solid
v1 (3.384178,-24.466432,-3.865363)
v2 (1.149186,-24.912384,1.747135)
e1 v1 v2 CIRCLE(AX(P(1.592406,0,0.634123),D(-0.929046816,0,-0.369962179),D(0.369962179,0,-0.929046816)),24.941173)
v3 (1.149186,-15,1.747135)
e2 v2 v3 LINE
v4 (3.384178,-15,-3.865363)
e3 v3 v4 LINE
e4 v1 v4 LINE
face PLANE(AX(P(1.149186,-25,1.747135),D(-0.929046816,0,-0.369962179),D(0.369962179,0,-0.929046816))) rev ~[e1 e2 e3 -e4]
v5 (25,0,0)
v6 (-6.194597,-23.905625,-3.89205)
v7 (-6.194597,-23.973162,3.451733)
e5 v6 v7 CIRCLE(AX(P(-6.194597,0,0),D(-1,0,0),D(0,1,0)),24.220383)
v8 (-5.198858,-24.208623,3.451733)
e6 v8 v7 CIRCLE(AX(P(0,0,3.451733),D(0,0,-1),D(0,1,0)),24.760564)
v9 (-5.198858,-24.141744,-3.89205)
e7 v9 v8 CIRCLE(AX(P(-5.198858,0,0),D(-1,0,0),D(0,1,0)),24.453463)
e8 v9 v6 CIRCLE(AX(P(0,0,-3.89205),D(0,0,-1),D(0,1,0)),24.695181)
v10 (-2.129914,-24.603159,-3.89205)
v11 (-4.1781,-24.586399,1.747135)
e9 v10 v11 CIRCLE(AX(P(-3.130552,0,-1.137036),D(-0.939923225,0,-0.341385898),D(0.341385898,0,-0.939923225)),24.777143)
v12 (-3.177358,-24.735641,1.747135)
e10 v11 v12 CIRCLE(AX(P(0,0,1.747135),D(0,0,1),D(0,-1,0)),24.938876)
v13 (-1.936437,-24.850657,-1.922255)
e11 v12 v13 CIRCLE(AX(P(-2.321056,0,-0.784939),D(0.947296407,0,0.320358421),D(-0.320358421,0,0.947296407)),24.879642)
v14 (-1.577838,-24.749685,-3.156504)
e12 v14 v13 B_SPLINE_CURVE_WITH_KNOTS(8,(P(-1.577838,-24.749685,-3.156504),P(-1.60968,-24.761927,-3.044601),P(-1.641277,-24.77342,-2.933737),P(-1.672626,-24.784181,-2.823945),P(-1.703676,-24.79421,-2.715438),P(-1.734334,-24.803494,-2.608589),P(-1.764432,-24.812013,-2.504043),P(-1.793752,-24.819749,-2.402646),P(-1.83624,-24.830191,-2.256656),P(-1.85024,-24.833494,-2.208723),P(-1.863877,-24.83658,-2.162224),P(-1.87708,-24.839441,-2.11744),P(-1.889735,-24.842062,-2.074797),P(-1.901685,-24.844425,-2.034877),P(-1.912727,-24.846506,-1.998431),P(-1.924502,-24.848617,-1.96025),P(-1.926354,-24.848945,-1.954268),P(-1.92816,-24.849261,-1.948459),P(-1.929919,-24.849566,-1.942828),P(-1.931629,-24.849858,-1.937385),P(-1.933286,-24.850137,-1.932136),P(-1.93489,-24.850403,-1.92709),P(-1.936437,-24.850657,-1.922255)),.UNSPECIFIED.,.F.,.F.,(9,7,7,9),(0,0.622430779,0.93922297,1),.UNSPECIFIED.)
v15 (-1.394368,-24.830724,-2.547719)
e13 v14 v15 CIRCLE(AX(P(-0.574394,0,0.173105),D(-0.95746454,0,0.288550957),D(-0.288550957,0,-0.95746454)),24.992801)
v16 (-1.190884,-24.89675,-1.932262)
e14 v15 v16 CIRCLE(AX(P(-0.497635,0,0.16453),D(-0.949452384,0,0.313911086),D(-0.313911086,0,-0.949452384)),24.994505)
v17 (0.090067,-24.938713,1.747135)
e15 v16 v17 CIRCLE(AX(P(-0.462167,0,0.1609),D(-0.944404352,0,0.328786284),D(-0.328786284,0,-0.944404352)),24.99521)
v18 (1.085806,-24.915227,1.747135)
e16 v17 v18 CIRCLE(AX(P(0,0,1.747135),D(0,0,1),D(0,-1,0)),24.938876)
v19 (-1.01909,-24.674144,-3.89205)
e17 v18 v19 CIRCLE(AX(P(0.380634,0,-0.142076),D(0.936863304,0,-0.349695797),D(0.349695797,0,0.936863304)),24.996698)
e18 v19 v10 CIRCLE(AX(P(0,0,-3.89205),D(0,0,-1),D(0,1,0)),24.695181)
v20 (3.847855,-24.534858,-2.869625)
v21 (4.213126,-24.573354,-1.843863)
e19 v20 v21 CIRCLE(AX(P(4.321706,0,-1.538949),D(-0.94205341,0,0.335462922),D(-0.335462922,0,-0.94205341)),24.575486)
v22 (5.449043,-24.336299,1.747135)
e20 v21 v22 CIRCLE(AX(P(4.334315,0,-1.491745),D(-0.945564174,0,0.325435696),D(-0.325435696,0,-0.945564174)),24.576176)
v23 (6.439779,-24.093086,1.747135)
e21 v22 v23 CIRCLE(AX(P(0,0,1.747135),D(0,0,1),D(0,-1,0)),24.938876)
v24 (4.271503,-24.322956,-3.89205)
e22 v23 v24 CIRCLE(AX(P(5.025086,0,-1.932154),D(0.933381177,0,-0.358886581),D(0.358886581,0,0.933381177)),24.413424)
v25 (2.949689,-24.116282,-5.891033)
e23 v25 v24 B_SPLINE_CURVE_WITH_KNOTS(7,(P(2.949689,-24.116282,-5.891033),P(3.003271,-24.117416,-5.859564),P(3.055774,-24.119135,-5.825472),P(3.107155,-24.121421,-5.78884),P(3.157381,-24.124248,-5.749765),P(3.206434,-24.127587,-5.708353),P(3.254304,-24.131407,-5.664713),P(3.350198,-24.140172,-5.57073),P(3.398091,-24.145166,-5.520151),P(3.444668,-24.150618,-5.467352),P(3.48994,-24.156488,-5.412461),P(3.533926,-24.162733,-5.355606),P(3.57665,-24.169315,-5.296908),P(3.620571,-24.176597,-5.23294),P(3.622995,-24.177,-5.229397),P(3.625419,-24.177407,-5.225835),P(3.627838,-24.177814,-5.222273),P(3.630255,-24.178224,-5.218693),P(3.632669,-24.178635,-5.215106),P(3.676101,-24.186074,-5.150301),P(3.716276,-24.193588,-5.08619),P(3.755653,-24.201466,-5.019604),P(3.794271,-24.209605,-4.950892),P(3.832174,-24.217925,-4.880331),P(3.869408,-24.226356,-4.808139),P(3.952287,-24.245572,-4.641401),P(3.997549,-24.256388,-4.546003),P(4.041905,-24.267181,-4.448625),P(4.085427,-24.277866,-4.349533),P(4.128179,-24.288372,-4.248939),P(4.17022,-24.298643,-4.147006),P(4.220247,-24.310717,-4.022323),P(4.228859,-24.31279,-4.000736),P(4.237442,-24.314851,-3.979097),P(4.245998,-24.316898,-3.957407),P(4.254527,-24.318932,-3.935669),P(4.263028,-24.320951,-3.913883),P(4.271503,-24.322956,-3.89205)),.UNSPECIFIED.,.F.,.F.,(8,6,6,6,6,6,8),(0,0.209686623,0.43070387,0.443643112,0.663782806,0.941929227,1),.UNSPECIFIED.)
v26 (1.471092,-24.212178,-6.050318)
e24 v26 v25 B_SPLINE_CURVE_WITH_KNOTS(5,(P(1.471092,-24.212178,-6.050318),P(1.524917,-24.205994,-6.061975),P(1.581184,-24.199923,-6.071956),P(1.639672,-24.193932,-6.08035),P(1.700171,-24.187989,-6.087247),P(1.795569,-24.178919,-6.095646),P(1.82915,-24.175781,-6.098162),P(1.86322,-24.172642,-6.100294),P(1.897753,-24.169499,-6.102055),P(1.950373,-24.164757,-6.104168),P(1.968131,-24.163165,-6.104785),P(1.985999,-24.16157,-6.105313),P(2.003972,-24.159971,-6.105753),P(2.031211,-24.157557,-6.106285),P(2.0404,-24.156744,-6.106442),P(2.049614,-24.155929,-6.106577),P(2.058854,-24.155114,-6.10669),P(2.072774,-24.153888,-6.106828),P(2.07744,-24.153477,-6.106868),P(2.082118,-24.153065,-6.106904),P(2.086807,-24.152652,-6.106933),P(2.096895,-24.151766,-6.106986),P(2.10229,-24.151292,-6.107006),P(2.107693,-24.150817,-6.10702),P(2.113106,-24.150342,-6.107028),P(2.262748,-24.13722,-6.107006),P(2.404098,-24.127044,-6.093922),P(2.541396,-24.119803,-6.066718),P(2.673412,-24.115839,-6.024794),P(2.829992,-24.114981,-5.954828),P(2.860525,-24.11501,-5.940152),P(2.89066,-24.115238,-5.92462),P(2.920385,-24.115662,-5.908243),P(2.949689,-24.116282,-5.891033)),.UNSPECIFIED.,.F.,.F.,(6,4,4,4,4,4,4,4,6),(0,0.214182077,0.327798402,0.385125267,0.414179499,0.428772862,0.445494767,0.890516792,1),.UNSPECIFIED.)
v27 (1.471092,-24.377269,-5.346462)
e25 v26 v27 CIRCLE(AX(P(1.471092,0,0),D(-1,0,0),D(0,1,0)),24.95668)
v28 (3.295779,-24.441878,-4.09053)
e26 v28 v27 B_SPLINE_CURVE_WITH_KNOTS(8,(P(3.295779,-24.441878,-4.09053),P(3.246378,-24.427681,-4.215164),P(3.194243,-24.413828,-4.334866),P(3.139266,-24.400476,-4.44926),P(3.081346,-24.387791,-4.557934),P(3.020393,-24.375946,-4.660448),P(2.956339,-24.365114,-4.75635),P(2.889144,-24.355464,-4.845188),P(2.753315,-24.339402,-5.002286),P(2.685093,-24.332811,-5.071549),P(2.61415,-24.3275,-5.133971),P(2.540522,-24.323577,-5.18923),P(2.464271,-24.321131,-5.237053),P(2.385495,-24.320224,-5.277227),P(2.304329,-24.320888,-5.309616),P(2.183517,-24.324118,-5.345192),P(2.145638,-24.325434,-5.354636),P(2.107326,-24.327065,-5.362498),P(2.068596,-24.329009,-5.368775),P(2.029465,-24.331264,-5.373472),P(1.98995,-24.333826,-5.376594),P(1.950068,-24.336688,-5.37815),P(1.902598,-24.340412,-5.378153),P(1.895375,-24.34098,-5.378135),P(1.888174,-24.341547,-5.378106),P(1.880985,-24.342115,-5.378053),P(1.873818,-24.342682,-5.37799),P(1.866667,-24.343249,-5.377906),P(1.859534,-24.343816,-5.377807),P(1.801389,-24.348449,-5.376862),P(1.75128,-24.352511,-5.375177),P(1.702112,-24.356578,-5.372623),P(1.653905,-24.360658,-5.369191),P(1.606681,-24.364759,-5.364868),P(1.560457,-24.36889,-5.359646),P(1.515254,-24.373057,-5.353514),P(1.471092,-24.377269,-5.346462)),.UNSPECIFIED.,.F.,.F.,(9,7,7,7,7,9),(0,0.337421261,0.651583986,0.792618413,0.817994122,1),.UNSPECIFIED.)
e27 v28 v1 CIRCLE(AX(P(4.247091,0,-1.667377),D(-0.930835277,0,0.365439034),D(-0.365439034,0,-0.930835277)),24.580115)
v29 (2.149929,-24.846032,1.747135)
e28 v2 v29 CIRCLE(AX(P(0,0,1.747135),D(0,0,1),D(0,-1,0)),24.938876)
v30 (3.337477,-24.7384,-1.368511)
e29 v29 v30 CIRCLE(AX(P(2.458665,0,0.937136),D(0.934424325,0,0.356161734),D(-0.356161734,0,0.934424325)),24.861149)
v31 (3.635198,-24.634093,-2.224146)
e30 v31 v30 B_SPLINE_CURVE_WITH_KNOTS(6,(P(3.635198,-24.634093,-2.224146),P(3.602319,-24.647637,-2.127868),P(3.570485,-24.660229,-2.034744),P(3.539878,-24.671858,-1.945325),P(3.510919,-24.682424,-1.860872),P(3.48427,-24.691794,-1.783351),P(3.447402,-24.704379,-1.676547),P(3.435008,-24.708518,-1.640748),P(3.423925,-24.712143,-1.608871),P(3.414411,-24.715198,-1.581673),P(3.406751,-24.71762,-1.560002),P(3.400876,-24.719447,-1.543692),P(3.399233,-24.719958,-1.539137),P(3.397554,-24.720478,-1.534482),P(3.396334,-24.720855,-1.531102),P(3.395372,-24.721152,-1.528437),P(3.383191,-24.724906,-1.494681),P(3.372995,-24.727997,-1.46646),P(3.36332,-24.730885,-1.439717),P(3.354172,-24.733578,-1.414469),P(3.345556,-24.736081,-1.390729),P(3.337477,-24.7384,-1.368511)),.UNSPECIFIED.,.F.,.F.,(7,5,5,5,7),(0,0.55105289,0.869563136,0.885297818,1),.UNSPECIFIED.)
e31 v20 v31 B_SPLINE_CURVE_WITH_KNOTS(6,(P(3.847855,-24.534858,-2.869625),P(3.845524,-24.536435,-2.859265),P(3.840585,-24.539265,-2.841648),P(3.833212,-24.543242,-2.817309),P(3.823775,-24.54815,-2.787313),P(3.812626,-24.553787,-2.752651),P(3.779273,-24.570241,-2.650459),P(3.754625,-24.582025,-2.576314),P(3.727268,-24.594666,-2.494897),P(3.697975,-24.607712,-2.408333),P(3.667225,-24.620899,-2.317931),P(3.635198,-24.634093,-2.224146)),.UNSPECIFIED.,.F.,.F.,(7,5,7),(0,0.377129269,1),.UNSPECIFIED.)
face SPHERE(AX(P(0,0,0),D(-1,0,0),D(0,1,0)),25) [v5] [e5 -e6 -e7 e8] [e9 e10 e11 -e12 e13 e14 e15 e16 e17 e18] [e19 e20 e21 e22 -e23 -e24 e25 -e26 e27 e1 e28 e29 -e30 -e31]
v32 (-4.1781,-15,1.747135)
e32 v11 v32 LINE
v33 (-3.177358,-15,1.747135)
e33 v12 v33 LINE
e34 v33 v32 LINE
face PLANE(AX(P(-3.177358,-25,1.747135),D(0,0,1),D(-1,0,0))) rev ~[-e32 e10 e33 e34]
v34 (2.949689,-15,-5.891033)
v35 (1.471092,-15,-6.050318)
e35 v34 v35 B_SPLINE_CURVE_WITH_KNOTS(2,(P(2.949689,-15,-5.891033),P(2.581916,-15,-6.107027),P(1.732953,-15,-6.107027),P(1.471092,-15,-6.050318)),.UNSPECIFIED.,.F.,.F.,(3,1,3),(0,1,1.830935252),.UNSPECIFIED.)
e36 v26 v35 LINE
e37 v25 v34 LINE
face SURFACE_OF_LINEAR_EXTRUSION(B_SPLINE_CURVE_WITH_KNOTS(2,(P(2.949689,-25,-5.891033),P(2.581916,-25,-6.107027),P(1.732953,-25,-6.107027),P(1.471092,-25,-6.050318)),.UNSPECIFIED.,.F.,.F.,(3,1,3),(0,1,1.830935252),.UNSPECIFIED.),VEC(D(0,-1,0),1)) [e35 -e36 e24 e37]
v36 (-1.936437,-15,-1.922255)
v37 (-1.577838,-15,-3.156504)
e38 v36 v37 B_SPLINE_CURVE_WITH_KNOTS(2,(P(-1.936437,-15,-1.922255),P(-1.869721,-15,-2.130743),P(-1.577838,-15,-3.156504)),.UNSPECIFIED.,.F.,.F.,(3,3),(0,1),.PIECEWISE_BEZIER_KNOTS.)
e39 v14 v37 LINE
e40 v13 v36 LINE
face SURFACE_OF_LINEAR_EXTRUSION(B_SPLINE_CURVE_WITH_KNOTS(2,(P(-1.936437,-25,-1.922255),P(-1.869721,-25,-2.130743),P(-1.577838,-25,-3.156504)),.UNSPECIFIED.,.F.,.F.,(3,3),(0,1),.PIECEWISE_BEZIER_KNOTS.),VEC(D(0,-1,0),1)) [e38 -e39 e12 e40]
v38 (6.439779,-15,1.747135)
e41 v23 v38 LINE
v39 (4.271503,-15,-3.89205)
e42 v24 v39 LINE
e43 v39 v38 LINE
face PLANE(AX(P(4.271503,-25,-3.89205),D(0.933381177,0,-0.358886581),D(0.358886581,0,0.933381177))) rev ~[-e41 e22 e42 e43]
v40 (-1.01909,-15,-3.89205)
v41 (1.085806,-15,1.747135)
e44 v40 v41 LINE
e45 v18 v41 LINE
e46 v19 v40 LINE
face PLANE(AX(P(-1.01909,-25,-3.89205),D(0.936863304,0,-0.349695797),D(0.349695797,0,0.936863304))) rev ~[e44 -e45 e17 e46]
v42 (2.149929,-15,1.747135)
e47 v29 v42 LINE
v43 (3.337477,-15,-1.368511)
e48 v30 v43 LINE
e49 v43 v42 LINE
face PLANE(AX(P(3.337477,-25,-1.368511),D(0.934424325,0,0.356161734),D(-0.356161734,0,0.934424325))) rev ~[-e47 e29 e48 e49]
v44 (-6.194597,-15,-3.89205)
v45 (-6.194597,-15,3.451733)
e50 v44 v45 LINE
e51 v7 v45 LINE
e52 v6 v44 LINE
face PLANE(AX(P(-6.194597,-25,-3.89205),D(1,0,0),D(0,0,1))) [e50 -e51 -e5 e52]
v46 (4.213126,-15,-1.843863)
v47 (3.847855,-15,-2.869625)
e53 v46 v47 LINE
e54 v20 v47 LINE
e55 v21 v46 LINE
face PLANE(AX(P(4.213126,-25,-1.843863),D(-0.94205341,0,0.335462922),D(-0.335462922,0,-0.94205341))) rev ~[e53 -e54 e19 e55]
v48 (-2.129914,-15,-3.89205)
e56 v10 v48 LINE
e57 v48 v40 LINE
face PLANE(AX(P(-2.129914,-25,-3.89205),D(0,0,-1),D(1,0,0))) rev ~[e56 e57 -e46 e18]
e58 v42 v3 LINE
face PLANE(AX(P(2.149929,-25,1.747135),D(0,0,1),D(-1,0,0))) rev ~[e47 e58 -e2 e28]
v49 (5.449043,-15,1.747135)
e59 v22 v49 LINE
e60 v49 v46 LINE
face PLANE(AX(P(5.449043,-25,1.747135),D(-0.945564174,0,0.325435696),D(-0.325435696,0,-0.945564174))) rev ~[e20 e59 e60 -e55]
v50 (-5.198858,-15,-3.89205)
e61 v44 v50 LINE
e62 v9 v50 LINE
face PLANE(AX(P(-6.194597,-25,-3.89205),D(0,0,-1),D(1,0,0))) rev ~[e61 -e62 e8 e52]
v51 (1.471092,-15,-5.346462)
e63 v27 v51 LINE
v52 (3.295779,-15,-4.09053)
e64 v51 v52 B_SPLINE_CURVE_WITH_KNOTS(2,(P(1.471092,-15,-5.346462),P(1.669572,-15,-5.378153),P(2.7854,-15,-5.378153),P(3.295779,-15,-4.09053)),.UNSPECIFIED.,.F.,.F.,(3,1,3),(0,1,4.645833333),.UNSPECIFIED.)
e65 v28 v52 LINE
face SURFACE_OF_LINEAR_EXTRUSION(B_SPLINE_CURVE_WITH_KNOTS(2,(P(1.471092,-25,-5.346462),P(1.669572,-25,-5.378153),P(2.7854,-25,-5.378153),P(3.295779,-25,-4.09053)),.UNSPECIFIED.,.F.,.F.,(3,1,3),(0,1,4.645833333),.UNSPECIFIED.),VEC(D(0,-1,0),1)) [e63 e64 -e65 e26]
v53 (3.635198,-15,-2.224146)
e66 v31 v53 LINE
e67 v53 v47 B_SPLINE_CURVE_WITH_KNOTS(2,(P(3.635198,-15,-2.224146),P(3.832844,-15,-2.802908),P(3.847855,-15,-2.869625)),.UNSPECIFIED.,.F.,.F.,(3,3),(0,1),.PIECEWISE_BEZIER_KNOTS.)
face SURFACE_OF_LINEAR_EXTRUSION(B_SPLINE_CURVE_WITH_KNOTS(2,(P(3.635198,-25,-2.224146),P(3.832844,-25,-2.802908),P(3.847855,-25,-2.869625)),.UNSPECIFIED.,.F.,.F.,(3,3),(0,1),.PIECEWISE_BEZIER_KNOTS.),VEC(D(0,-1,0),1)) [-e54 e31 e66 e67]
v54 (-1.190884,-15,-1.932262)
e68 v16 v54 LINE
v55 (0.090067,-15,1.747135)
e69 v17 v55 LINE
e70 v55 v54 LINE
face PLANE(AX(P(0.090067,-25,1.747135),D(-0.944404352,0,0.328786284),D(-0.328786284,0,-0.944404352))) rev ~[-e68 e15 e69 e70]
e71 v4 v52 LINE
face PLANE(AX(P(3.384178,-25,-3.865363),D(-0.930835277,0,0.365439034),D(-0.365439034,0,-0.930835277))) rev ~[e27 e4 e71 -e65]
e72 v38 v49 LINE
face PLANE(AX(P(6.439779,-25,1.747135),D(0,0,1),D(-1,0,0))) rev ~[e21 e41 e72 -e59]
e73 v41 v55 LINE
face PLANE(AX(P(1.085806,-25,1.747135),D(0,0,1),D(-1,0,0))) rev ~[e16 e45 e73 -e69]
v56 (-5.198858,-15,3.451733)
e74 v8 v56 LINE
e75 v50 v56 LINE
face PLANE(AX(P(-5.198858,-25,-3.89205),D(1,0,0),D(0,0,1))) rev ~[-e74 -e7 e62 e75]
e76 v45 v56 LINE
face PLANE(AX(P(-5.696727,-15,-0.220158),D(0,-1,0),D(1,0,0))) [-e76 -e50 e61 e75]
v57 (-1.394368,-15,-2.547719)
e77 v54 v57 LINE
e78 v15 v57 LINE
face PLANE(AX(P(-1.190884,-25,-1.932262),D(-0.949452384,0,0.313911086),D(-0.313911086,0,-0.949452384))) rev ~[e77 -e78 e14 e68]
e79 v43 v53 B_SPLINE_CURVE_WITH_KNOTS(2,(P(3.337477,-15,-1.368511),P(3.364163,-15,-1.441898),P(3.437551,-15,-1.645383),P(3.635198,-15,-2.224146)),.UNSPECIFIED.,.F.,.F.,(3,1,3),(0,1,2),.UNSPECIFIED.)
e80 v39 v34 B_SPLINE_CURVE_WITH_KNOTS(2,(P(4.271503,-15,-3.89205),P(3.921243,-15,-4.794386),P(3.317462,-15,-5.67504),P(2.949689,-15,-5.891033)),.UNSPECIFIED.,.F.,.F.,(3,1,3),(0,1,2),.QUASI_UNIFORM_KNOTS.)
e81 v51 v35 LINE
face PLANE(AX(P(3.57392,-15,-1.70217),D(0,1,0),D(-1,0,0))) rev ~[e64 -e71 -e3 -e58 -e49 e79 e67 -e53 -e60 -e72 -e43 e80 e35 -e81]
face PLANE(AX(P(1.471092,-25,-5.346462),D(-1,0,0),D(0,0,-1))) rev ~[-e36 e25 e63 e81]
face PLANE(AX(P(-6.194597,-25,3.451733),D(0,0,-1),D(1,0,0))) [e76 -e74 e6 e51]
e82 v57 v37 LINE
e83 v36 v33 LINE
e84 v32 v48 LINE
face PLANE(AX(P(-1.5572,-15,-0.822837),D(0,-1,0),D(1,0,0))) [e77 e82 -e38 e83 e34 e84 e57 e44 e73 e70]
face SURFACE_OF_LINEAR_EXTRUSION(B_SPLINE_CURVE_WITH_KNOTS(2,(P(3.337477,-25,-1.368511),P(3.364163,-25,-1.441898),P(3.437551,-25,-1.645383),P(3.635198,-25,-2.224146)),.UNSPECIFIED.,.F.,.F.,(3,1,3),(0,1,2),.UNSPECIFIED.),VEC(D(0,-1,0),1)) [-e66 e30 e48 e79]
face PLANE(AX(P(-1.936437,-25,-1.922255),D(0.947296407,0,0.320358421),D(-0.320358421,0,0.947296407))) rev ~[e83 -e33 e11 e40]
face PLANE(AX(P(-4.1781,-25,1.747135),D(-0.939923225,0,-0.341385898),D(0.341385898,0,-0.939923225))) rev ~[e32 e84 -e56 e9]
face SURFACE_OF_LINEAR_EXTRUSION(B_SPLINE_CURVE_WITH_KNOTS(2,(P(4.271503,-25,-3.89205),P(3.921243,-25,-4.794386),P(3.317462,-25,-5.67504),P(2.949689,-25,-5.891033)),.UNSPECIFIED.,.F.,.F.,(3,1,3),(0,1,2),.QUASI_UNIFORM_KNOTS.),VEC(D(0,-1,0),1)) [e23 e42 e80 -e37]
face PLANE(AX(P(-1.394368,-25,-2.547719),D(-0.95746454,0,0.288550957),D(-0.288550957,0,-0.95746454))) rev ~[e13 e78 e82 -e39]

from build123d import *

# Parameters (mm, degrees)
F4_DEPTH = 10
F3_W     = 0.9957388944
F3_H     = 7.3437828345
F5_DEPTH = 10
F6_DEPTH = 10


with BuildPart() as f1:
    # F0 (on Top) → F1 (revolve)
    with BuildSketch(Plane.XY):
        with BuildLine():
            Line((-25, 0), (25, 0))
            ThreePointArc((25, 0), (0, 25), (-25, 0))
        make_face()
    revolve(axis=Axis((0, 0, 0), (-1, 0, 0)))

    # F3 (on offset) → F4 (cut)
    with BuildSketch(Plane.XZ.offset(25)):
        with BuildLine():
            Line((-2.1299138496, -3.89204987), (-1.0190895553, -3.89204987))
            Line((-1.0190895553, -3.89204987), (1.0858057291, 1.7471347231))
            Line((1.0858057291, 1.7471347231), (0.0900668347, 1.7471347231))
            Line((0.0900668347, 1.7471347231), (-1.1908837029, -1.9322622637))
            Line((-1.1908837029, -1.9322622637), (-1.3943680331, -2.5477189673))
            Line((-1.3943680331, -2.5477189673), (-1.5778375111, -3.1565040535))
            add(Edge.make_bspline(
                [(-1.9364369455, -1.9222548377), (-1.8697207716, -2.1307428809), (-1.5778375111, -3.1565040535)],
                knots=[0, 0, 0, 1, 1, 1], degree=2))
            Line((-1.9364369455, -1.9222548377), (-3.1773577787, 1.7471347231))
            Line((-3.1773577787, 1.7471347231), (-4.1781003862, 1.7471347231))
            Line((-4.1781003862, 1.7471347231), (-2.1299138496, -3.89204987))
        make_face()
    extrude(amount=-F4_DEPTH, mode=Mode.SUBTRACT)

    # F3 (on offset) → F5 (cut)
    with BuildSketch(Plane.XZ.offset(25)):
        with Locations((-5.6967272931, -0.2201584528)):
            Rectangle(F3_W, F3_H)
    extrude(amount=-F5_DEPTH, mode=Mode.SUBTRACT)

    # F3 (on offset) → F6 (cut)
    with BuildSketch(Plane.XZ.offset(25)):
        with BuildLine():
            add(Edge.make_bspline(
                [(2.1182385192, -6.1070268413), (1.7329526153, -6.1070268413), (1.471091633, -6.0503180935)],
                knots=[0, 0, 0, 1, 1, 1], degree=2))
            add(Edge.make_bspline(
                [(2.9496888355, -5.8910332285), (2.5819159273, -6.1070268413), (2.1182385192, -6.1070268413)],
                knots=[0, 0, 0, 1, 1, 1], degree=2))
            add(Edge.make_bspline(
                [(3.6193524304, -5.2347128684), (3.3174617438, -5.6750396157), (2.9496888355, -5.8910332285)],
                knots=[0, 0, 0, 1, 1, 1], degree=2))
            add(Edge.make_bspline(
                [(4.2715030296, -3.89204987), (3.921243117, -4.7943861211), (3.6193524304, -5.2347128684)],
                knots=[0, 0, 0, 1, 1, 1], degree=2))
            Line((4.2715030296, -3.89204987), (6.4397786791, 1.7471347231))
            Line((6.4397786791, 1.7471347231), (5.4490434977, 1.7471347231))
            Line((5.4490434977, 1.7471347231), (4.2131263775, -1.8438633334))
            Line((4.2131263775, -1.8438633334), (3.8478553258, -2.8696245061))
            add(Edge.make_bspline(
                [(3.6351975217, -2.2241455242), (3.8328441866, -2.8029083322), (3.8478553258, -2.8696245061)],
                knots=[0, 0, 0, 1, 1, 1], degree=2))
            add(Edge.make_bspline(
                [(3.4008569611, -1.5436405512), (3.4375508567, -1.6453827163), (3.6351975217, -2.2241455242)],
                knots=[0, 0, 0, 1, 1, 1], degree=2))
            add(Edge.make_bspline(
                [(3.3374765959, -1.3685105949), (3.3641630655, -1.4418983861), (3.4008569611, -1.5436405512)],
                knots=[0, 0, 0, 1, 1, 1], degree=2))
            Line((3.3374765959, -1.3685105949), (2.1499287017, 1.7471347231))
            Line((2.1499287017, 1.7471347231), (1.1491860943, 1.7471347231))
            Line((1.1491860943, 1.7471347231), (3.3841779176, -3.8653634005))
            Line((3.3841779176, -3.8653634005), (3.2957789873, -4.0905304872))
            add(Edge.make_bspline(
                [(1.9097504759, -5.3781526422), (2.7854002575, -5.3781526422), (3.2957789873, -4.0905304872)],
                knots=[0, 0, 0, 1, 1, 1], degree=2))
            add(Edge.make_bspline(
                [(1.471091633, -5.3464624596), (1.6695722501, -5.3781526422), (1.9097504759, -5.3781526422)],
                knots=[0, 0, 0, 1, 1, 1], degree=2))
            Line((1.471091633, -5.3464624596), (1.471091633, -6.0503180935))
        make_face()
    extrude(amount=-F6_DEPTH, mode=Mode.SUBTRACT)


solid = f1.part
